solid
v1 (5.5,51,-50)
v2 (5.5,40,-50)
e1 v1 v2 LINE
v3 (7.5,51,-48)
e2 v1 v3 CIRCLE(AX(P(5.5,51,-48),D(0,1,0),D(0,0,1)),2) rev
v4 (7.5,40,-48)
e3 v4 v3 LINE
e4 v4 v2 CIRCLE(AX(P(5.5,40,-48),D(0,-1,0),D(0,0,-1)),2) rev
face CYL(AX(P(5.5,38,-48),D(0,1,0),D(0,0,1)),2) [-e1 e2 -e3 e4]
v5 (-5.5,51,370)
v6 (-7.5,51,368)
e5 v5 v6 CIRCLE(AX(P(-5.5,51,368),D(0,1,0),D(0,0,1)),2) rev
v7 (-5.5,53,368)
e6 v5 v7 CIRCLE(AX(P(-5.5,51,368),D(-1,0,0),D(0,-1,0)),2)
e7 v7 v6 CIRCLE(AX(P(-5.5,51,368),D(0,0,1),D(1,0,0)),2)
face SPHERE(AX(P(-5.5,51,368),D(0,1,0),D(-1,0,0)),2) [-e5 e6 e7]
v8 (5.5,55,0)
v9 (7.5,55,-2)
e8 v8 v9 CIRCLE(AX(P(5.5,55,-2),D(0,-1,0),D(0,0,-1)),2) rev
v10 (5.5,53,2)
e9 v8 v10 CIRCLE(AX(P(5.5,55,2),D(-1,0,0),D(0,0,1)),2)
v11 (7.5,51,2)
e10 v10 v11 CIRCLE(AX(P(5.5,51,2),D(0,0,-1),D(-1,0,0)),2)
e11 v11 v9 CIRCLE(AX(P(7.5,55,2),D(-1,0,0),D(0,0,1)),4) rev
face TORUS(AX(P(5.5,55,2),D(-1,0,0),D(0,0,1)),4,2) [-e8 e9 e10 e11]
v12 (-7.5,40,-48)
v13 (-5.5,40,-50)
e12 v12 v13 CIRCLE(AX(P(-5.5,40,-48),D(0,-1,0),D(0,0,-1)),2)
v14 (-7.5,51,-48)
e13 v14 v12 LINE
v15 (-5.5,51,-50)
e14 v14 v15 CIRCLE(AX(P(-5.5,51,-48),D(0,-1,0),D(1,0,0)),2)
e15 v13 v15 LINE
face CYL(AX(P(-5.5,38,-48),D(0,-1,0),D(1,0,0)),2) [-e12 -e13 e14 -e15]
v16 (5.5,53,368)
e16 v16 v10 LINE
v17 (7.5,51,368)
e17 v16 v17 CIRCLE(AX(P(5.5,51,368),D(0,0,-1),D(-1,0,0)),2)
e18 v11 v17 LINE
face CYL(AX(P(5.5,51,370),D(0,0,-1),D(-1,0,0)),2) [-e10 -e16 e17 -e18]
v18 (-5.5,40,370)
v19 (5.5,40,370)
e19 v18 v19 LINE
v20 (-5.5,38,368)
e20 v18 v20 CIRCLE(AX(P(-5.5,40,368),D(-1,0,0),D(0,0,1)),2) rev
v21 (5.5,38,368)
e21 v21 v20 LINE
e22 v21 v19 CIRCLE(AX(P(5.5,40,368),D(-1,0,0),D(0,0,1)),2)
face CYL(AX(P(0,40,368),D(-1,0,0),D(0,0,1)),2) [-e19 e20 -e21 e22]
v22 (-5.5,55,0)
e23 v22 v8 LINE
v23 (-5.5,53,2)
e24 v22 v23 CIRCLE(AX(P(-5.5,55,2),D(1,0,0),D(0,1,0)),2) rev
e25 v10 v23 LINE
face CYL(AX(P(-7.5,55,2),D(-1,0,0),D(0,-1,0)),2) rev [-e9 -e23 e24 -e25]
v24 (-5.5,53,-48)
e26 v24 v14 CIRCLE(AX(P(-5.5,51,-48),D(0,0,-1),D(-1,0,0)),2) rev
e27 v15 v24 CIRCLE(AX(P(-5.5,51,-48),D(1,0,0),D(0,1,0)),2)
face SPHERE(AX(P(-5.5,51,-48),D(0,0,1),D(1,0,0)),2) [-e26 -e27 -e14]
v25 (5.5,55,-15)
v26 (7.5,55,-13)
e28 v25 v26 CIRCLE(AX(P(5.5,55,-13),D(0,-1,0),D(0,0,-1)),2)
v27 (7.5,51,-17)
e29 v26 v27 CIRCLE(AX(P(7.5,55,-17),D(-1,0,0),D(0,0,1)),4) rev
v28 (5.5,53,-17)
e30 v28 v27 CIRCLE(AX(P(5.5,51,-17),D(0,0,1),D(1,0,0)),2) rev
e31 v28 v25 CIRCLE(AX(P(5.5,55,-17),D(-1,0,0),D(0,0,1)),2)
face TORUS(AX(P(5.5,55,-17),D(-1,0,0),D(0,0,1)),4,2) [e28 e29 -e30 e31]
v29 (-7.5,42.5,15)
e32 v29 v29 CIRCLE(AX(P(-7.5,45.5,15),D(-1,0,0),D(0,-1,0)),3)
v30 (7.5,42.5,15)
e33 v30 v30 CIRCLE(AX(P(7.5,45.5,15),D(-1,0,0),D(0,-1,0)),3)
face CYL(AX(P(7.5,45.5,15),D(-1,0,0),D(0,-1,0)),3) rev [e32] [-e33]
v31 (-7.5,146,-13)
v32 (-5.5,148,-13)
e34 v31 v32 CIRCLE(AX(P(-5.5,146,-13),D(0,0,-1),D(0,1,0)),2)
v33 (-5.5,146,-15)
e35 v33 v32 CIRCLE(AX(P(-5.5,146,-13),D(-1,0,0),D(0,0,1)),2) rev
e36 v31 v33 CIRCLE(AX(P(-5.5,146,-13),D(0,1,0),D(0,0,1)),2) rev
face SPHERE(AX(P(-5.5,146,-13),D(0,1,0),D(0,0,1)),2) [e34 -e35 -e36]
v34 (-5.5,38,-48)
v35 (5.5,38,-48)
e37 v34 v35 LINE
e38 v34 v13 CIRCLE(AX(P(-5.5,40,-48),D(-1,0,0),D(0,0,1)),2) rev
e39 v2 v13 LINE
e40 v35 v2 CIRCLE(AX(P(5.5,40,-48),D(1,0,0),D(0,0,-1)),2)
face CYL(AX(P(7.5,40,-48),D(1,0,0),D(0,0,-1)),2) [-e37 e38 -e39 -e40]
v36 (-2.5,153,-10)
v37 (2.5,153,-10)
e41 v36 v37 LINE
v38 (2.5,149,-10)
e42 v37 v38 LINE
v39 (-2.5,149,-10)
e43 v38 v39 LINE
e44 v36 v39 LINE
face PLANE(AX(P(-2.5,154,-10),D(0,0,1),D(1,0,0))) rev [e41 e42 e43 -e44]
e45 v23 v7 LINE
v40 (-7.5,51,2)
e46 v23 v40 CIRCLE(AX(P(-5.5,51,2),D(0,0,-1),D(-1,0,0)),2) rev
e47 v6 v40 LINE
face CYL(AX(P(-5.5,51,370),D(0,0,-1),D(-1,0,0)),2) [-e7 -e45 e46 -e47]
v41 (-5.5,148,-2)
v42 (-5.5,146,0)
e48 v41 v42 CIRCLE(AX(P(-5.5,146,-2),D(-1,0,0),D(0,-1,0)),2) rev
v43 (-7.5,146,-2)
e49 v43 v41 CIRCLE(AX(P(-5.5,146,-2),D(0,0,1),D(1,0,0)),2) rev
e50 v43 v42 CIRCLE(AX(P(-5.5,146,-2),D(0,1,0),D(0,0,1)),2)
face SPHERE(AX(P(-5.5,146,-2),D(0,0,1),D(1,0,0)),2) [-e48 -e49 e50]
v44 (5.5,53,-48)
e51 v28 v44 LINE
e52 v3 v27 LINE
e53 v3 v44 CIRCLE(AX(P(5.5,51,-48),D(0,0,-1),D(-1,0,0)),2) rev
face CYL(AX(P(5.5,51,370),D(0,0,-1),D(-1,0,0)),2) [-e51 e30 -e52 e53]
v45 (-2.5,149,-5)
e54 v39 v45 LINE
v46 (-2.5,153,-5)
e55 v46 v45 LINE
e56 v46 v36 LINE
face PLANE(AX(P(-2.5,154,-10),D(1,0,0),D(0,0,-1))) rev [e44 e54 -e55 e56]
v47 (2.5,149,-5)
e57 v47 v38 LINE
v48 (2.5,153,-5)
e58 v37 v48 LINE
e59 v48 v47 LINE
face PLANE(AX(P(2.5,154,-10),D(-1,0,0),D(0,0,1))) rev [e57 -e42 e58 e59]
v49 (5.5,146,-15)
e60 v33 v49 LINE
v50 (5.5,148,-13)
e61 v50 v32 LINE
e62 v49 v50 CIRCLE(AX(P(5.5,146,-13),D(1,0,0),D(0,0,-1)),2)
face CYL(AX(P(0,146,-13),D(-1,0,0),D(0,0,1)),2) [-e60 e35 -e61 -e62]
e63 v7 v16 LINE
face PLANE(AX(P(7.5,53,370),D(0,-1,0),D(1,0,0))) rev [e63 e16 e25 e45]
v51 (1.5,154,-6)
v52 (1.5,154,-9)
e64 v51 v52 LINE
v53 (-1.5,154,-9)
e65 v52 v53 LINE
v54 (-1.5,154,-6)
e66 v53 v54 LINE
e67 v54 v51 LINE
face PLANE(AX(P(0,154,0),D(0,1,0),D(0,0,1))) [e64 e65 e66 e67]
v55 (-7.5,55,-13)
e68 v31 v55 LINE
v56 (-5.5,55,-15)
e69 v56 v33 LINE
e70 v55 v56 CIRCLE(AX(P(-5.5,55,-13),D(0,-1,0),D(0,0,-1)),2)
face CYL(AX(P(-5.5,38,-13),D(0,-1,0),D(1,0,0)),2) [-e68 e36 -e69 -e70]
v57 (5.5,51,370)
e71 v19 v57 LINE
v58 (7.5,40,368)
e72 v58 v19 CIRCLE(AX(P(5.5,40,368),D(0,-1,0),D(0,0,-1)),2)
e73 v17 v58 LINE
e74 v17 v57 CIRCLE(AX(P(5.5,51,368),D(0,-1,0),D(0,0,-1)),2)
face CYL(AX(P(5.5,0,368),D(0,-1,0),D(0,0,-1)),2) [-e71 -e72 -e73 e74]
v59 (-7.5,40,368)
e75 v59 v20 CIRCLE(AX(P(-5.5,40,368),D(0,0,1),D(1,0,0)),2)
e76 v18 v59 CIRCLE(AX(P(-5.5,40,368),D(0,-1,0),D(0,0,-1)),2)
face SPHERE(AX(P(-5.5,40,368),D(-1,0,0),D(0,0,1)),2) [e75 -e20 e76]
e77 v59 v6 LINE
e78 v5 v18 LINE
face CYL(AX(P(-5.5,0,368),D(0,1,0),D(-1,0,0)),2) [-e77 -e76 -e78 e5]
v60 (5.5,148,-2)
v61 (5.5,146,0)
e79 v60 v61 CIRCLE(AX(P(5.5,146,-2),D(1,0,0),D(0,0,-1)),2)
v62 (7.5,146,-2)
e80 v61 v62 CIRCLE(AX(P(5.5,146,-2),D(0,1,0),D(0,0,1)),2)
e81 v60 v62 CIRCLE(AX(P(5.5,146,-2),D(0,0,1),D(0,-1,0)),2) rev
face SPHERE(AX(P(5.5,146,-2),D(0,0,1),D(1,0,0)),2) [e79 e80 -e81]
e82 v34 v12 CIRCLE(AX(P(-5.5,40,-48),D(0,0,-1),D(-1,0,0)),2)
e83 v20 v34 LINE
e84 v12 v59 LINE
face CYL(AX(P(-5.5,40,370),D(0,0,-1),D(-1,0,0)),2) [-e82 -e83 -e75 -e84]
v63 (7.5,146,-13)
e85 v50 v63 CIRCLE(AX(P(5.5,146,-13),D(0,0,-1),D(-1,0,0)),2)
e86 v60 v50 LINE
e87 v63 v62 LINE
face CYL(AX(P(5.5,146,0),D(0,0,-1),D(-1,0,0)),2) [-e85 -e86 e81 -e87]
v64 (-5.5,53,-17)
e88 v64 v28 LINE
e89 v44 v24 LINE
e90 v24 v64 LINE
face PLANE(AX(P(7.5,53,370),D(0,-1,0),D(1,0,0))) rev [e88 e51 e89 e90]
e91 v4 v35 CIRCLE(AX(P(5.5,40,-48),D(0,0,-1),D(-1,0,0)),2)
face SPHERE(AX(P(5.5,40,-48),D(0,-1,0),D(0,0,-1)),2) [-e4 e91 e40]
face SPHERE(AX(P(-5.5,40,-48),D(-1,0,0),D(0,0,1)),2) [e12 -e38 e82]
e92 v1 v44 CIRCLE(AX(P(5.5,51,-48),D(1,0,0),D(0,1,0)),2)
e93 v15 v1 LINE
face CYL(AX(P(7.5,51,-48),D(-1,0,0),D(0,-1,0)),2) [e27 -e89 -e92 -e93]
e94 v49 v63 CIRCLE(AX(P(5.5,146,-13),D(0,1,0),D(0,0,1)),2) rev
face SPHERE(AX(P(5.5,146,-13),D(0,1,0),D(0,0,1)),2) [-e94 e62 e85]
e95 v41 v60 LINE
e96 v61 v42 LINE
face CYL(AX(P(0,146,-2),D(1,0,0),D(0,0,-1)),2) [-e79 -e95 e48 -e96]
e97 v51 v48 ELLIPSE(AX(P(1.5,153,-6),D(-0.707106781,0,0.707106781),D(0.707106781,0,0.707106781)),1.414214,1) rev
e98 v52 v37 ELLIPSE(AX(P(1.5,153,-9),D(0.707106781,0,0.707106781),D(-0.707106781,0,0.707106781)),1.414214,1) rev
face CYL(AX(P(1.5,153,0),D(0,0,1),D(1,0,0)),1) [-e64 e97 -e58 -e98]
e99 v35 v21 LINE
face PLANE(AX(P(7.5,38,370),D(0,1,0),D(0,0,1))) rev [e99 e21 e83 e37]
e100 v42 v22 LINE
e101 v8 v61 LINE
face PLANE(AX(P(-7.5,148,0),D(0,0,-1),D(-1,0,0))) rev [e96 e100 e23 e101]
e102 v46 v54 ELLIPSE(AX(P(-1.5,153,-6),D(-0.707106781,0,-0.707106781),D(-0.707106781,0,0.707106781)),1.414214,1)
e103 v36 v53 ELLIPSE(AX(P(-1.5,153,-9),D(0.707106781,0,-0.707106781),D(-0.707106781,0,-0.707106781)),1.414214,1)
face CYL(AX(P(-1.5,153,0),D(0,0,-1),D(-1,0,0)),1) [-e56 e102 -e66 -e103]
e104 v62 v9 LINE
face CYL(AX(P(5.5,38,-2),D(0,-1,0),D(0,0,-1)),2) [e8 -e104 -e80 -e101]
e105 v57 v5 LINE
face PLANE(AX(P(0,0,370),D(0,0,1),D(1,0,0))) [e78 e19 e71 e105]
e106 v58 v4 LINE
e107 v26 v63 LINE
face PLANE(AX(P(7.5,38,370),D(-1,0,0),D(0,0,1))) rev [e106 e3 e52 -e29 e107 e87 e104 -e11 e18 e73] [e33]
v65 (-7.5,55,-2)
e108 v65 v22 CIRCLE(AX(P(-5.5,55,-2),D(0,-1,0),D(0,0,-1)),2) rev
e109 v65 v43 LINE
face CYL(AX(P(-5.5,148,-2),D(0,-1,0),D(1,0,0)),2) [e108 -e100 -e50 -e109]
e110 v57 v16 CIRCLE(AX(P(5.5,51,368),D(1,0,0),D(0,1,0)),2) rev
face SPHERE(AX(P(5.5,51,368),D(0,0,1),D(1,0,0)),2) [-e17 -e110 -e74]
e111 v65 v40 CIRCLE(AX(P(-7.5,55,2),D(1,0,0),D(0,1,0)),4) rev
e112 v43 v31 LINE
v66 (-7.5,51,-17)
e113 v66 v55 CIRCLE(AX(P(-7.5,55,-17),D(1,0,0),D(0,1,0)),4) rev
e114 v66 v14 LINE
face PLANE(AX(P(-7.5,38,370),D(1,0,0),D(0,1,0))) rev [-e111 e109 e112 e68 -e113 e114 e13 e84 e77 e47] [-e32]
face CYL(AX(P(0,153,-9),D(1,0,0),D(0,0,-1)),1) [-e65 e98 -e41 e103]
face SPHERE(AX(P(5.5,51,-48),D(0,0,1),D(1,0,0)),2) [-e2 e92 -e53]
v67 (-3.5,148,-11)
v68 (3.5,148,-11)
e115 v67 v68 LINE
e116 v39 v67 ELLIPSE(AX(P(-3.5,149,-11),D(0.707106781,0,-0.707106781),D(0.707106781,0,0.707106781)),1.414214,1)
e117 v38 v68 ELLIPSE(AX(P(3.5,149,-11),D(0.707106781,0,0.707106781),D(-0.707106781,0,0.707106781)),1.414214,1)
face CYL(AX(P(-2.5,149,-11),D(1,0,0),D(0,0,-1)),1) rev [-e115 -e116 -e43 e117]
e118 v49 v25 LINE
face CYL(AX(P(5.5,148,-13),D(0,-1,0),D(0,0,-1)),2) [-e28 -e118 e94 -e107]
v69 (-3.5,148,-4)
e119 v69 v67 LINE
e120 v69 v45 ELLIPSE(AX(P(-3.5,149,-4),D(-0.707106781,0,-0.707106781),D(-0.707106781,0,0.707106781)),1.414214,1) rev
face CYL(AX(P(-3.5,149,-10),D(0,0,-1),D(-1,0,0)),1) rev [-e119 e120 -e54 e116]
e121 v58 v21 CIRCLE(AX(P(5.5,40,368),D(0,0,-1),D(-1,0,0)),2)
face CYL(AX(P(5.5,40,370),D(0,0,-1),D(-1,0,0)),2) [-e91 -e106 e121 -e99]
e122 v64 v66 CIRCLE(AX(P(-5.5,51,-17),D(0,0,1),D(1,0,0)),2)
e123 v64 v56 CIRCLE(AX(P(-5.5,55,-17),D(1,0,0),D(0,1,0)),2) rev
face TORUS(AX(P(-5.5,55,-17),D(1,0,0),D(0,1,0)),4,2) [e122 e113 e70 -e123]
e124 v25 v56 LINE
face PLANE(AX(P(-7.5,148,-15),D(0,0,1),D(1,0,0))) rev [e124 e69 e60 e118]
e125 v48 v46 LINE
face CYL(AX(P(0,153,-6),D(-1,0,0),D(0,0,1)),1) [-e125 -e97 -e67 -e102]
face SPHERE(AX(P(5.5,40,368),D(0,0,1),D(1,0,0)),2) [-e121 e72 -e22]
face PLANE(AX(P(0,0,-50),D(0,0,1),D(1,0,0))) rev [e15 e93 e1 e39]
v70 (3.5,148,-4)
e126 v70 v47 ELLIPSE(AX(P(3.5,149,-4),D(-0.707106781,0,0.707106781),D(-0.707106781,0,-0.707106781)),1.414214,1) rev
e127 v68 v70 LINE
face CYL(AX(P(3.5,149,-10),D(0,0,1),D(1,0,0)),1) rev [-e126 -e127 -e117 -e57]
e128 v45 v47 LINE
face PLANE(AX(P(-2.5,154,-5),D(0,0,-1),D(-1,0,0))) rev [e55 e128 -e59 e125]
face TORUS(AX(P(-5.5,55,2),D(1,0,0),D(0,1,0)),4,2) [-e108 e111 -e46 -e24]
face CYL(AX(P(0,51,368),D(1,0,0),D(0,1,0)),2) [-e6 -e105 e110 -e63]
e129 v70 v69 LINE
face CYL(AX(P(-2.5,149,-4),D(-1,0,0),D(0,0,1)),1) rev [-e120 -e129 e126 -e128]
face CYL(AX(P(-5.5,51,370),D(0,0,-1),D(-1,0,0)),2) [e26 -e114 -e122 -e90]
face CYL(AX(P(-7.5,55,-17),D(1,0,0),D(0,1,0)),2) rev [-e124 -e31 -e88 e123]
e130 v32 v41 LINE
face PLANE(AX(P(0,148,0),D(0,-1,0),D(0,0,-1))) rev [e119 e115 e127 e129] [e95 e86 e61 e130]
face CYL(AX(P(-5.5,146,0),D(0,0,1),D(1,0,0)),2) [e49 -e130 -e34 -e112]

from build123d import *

# Parameters (mm, degrees)
SKETCH13_W          = 15
SKETCH13_H          = 15
BOSS_EXTRUDE3_DEPTH = 420
BOSS_EXTRUDE4_START = -70
SKETCH12_W          = 15
SKETCH12_H          = 15
BOSS_EXTRUDE4_DEPTH = 110
SKETCH14_W          = 5
SKETCH14_H          = 5
BOSS_EXTRUDE5_DEPTH = 6
FILLET1_R           = 2
FILLET2_R           = 1
FILLET3_R           = 2
FILLET4_R           = 2
SKETCH15_R          = 3
CUT_EXTRUDE1_DEPTH  = 402.04987221


with BuildPart() as part:
    # Sketch13 → Boss-Extrude3 (new body)
    with BuildSketch(Plane.XY.offset(-50)):
        with Locations((0, 45.5)):
            Rectangle(SKETCH13_W, SKETCH13_H)
    extrude(amount=BOSS_EXTRUDE3_DEPTH)

    # Sketch12 → Boss-Extrude4 (add)
    with BuildSketch(Plane(origin=(0, 108, 0), x_dir=(1, 0, 0), z_dir=(0, 1, 0)).offset(BOSS_EXTRUDE4_START)):
        with Locations((0, 7.5)):
            Rectangle(SKETCH12_W, SKETCH12_H)
    extrude(amount=BOSS_EXTRUDE4_DEPTH)

    # Sketch14 → Boss-Extrude5 (add)
    with BuildSketch(Plane(origin=(0, 148, 0), x_dir=(1, 0, 0), z_dir=(0, 1, 0))):
        with Locations((0, 7.5)):
            Rectangle(SKETCH14_W, SKETCH14_H)
    extrude(amount=BOSS_EXTRUDE5_DEPTH)

    # Fillet1
    fillet1_edges = [part.edges().sort_by_distance(p)[0] for p in [
        (-7.5, 45.5, 370),
        (0, 38, 370),
        (-7.5, 53, -32.5),
        (7.5, 53, -32.5),
        (-7.5, 100.5, -15),
        (-7.5, 100.5, 0),
        (0, 53, 0),
        (7.5, 100.5, 0),
        (7.5, 100.5, -15),
        (0, 53, -15),
        (-7.5, 148, -7.5),
        (0, 148, 0),
        (7.5, 148, -7.5),
        (0, 148, -15),
        (0, 38, -50),
        (-7.5, 45.5, -50),
        (7.5, 45.5, -50),
        (7.5, 38, 160),
        (-7.5, 38, 160),
        (-7.5, 53, 185),
        (7.5, 53, 185),
        (0, 53, 370),
    ]]
    fillet(fillet1_edges, radius=FILLET1_R)

    # Fillet2
    fillet2_edges = [part.edges().sort_by_distance(p)[0] for p in [
        (2.5, 148, -7.5),
        (0, 148, -10),
        (-2.5, 148, -7.5),
        (0, 148, -5),
        (2.5, 154, -7.5),
        (0, 154, -10),
        (-2.5, 154, -7.5),
        (0, 154, -5),
    ]]
    fillet(fillet2_edges, radius=FILLET2_R)

    # Fillet3
    # the kernel refuses this fillet: 2 mm, written as the material it takes off along each edge
    with BuildSketch(Plane(origin=(5.5, 51, 368), x_dir=(0, 0, 1), z_dir=(1, 0, 0))) as fillet3_piece_1_section:
        Polygon((0, 0), (FILLET3_R, 0), (FILLET3_R, -FILLET3_R), (0, -FILLET3_R), align=None)
    fillet3_piece_1 = extrude(amount=FILLET3_R, mode=Mode.PRIVATE)
    fillet3_piece_1 = fillet3_piece_1 - Plane(origin=(5.5, 51, 368), x_dir=(0, -0.7071067811865475, -0.7071067811865475), z_dir=(1, 0, 0)) * Sphere(FILLET3_R, mode=Mode.PRIVATE)
    add(fillet3_piece_1, mode=Mode.SUBTRACT)
    with BuildSketch(Plane(origin=(5.5, 40, 368), x_dir=(0, 0, 1), z_dir=(1, 0, 0))) as fillet3_piece_2_section:
        Polygon((0, 0), (FILLET3_R, 0), (FILLET3_R, FILLET3_R), (0, FILLET3_R), align=None)
    fillet3_piece_2 = extrude(amount=FILLET3_R, mode=Mode.PRIVATE)
    fillet3_piece_2 = fillet3_piece_2 - Plane(origin=(5.5, 40, 368), x_dir=(0, 0.7071067811865475, -0.7071067811865475), z_dir=(1, 0, 0)) * Sphere(FILLET3_R, mode=Mode.PRIVATE)
    add(fillet3_piece_2, mode=Mode.SUBTRACT)
    with BuildSketch(Plane(origin=(7.5, 51, 370), x_dir=(0, 0, -1), z_dir=(0, -1, 0))) as fillet3_piece_3:
        with BuildLine():
            CenterArc((FILLET3_R, -FILLET3_R), FILLET3_R, 90, 90)
            Line((0, -FILLET3_R), (0, 0))
            Line((0, 0), (FILLET3_R, 0))
        make_face()
    extrude(amount=11, mode=Mode.SUBTRACT)

    # Fillet4
    # the kernel refuses this fillet: 2 mm, written as the material it takes off along each edge
    with BuildSketch(Plane(origin=(-5.5, 51, -48), x_dir=(0, 1, 0), z_dir=(0, 0, -1))) as fillet4_piece_1_section:
        Polygon((0, 0), (FILLET4_R, 0), (FILLET4_R, -FILLET4_R), (0, -FILLET4_R), align=None)
    fillet4_piece_1 = extrude(amount=FILLET4_R, mode=Mode.PRIVATE)
    fillet4_piece_1 = fillet4_piece_1 - Plane(origin=(-5.5, 51, -48), x_dir=(0.7071067811865472, -0.7071067811865478, 0), z_dir=(0, 0, -1)) * Sphere(FILLET4_R, mode=Mode.PRIVATE)
    add(fillet4_piece_1, mode=Mode.SUBTRACT)
    with BuildSketch(Plane(origin=(5.5, 51, -48), x_dir=(0, 1, 0), z_dir=(0, 0, -1))) as fillet4_piece_2_section:
        Polygon((0, 0), (FILLET4_R, 0), (FILLET4_R, FILLET4_R), (0, FILLET4_R), align=None)
    fillet4_piece_2 = extrude(amount=FILLET4_R, mode=Mode.PRIVATE)
    fillet4_piece_2 = fillet4_piece_2 - Plane(origin=(5.5, 51, -48), x_dir=(-0.7071067811865479, -0.7071067811865472, 0), z_dir=(0, 0, -1)) * Sphere(FILLET4_R, mode=Mode.PRIVATE)
    add(fillet4_piece_2, mode=Mode.SUBTRACT)
    with BuildSketch(Plane(origin=(-5.5, 53, -50), x_dir=(0, -1, 0), z_dir=(1, 0, 0))) as fillet4_piece_3:
        with BuildLine():
            CenterArc((FILLET4_R, -FILLET4_R), FILLET4_R, 90, 90)
            Line((0, -FILLET4_R), (0, 0))
            Line((0, 0), (FILLET4_R, 0))
        make_face()
    extrude(amount=11, mode=Mode.SUBTRACT)

    # Sketch15 → Cut-Extrude1 (cut, through all)
    with BuildSketch(Plane.ZY.offset(7.5)):
        with Locations(Location((15, 45.5, 0), (0, 0, 270))):
            Circle(SKETCH15_R)
    extrude(amount=-CUT_EXTRUDE1_DEPTH, mode=Mode.SUBTRACT)


solid = part.part
